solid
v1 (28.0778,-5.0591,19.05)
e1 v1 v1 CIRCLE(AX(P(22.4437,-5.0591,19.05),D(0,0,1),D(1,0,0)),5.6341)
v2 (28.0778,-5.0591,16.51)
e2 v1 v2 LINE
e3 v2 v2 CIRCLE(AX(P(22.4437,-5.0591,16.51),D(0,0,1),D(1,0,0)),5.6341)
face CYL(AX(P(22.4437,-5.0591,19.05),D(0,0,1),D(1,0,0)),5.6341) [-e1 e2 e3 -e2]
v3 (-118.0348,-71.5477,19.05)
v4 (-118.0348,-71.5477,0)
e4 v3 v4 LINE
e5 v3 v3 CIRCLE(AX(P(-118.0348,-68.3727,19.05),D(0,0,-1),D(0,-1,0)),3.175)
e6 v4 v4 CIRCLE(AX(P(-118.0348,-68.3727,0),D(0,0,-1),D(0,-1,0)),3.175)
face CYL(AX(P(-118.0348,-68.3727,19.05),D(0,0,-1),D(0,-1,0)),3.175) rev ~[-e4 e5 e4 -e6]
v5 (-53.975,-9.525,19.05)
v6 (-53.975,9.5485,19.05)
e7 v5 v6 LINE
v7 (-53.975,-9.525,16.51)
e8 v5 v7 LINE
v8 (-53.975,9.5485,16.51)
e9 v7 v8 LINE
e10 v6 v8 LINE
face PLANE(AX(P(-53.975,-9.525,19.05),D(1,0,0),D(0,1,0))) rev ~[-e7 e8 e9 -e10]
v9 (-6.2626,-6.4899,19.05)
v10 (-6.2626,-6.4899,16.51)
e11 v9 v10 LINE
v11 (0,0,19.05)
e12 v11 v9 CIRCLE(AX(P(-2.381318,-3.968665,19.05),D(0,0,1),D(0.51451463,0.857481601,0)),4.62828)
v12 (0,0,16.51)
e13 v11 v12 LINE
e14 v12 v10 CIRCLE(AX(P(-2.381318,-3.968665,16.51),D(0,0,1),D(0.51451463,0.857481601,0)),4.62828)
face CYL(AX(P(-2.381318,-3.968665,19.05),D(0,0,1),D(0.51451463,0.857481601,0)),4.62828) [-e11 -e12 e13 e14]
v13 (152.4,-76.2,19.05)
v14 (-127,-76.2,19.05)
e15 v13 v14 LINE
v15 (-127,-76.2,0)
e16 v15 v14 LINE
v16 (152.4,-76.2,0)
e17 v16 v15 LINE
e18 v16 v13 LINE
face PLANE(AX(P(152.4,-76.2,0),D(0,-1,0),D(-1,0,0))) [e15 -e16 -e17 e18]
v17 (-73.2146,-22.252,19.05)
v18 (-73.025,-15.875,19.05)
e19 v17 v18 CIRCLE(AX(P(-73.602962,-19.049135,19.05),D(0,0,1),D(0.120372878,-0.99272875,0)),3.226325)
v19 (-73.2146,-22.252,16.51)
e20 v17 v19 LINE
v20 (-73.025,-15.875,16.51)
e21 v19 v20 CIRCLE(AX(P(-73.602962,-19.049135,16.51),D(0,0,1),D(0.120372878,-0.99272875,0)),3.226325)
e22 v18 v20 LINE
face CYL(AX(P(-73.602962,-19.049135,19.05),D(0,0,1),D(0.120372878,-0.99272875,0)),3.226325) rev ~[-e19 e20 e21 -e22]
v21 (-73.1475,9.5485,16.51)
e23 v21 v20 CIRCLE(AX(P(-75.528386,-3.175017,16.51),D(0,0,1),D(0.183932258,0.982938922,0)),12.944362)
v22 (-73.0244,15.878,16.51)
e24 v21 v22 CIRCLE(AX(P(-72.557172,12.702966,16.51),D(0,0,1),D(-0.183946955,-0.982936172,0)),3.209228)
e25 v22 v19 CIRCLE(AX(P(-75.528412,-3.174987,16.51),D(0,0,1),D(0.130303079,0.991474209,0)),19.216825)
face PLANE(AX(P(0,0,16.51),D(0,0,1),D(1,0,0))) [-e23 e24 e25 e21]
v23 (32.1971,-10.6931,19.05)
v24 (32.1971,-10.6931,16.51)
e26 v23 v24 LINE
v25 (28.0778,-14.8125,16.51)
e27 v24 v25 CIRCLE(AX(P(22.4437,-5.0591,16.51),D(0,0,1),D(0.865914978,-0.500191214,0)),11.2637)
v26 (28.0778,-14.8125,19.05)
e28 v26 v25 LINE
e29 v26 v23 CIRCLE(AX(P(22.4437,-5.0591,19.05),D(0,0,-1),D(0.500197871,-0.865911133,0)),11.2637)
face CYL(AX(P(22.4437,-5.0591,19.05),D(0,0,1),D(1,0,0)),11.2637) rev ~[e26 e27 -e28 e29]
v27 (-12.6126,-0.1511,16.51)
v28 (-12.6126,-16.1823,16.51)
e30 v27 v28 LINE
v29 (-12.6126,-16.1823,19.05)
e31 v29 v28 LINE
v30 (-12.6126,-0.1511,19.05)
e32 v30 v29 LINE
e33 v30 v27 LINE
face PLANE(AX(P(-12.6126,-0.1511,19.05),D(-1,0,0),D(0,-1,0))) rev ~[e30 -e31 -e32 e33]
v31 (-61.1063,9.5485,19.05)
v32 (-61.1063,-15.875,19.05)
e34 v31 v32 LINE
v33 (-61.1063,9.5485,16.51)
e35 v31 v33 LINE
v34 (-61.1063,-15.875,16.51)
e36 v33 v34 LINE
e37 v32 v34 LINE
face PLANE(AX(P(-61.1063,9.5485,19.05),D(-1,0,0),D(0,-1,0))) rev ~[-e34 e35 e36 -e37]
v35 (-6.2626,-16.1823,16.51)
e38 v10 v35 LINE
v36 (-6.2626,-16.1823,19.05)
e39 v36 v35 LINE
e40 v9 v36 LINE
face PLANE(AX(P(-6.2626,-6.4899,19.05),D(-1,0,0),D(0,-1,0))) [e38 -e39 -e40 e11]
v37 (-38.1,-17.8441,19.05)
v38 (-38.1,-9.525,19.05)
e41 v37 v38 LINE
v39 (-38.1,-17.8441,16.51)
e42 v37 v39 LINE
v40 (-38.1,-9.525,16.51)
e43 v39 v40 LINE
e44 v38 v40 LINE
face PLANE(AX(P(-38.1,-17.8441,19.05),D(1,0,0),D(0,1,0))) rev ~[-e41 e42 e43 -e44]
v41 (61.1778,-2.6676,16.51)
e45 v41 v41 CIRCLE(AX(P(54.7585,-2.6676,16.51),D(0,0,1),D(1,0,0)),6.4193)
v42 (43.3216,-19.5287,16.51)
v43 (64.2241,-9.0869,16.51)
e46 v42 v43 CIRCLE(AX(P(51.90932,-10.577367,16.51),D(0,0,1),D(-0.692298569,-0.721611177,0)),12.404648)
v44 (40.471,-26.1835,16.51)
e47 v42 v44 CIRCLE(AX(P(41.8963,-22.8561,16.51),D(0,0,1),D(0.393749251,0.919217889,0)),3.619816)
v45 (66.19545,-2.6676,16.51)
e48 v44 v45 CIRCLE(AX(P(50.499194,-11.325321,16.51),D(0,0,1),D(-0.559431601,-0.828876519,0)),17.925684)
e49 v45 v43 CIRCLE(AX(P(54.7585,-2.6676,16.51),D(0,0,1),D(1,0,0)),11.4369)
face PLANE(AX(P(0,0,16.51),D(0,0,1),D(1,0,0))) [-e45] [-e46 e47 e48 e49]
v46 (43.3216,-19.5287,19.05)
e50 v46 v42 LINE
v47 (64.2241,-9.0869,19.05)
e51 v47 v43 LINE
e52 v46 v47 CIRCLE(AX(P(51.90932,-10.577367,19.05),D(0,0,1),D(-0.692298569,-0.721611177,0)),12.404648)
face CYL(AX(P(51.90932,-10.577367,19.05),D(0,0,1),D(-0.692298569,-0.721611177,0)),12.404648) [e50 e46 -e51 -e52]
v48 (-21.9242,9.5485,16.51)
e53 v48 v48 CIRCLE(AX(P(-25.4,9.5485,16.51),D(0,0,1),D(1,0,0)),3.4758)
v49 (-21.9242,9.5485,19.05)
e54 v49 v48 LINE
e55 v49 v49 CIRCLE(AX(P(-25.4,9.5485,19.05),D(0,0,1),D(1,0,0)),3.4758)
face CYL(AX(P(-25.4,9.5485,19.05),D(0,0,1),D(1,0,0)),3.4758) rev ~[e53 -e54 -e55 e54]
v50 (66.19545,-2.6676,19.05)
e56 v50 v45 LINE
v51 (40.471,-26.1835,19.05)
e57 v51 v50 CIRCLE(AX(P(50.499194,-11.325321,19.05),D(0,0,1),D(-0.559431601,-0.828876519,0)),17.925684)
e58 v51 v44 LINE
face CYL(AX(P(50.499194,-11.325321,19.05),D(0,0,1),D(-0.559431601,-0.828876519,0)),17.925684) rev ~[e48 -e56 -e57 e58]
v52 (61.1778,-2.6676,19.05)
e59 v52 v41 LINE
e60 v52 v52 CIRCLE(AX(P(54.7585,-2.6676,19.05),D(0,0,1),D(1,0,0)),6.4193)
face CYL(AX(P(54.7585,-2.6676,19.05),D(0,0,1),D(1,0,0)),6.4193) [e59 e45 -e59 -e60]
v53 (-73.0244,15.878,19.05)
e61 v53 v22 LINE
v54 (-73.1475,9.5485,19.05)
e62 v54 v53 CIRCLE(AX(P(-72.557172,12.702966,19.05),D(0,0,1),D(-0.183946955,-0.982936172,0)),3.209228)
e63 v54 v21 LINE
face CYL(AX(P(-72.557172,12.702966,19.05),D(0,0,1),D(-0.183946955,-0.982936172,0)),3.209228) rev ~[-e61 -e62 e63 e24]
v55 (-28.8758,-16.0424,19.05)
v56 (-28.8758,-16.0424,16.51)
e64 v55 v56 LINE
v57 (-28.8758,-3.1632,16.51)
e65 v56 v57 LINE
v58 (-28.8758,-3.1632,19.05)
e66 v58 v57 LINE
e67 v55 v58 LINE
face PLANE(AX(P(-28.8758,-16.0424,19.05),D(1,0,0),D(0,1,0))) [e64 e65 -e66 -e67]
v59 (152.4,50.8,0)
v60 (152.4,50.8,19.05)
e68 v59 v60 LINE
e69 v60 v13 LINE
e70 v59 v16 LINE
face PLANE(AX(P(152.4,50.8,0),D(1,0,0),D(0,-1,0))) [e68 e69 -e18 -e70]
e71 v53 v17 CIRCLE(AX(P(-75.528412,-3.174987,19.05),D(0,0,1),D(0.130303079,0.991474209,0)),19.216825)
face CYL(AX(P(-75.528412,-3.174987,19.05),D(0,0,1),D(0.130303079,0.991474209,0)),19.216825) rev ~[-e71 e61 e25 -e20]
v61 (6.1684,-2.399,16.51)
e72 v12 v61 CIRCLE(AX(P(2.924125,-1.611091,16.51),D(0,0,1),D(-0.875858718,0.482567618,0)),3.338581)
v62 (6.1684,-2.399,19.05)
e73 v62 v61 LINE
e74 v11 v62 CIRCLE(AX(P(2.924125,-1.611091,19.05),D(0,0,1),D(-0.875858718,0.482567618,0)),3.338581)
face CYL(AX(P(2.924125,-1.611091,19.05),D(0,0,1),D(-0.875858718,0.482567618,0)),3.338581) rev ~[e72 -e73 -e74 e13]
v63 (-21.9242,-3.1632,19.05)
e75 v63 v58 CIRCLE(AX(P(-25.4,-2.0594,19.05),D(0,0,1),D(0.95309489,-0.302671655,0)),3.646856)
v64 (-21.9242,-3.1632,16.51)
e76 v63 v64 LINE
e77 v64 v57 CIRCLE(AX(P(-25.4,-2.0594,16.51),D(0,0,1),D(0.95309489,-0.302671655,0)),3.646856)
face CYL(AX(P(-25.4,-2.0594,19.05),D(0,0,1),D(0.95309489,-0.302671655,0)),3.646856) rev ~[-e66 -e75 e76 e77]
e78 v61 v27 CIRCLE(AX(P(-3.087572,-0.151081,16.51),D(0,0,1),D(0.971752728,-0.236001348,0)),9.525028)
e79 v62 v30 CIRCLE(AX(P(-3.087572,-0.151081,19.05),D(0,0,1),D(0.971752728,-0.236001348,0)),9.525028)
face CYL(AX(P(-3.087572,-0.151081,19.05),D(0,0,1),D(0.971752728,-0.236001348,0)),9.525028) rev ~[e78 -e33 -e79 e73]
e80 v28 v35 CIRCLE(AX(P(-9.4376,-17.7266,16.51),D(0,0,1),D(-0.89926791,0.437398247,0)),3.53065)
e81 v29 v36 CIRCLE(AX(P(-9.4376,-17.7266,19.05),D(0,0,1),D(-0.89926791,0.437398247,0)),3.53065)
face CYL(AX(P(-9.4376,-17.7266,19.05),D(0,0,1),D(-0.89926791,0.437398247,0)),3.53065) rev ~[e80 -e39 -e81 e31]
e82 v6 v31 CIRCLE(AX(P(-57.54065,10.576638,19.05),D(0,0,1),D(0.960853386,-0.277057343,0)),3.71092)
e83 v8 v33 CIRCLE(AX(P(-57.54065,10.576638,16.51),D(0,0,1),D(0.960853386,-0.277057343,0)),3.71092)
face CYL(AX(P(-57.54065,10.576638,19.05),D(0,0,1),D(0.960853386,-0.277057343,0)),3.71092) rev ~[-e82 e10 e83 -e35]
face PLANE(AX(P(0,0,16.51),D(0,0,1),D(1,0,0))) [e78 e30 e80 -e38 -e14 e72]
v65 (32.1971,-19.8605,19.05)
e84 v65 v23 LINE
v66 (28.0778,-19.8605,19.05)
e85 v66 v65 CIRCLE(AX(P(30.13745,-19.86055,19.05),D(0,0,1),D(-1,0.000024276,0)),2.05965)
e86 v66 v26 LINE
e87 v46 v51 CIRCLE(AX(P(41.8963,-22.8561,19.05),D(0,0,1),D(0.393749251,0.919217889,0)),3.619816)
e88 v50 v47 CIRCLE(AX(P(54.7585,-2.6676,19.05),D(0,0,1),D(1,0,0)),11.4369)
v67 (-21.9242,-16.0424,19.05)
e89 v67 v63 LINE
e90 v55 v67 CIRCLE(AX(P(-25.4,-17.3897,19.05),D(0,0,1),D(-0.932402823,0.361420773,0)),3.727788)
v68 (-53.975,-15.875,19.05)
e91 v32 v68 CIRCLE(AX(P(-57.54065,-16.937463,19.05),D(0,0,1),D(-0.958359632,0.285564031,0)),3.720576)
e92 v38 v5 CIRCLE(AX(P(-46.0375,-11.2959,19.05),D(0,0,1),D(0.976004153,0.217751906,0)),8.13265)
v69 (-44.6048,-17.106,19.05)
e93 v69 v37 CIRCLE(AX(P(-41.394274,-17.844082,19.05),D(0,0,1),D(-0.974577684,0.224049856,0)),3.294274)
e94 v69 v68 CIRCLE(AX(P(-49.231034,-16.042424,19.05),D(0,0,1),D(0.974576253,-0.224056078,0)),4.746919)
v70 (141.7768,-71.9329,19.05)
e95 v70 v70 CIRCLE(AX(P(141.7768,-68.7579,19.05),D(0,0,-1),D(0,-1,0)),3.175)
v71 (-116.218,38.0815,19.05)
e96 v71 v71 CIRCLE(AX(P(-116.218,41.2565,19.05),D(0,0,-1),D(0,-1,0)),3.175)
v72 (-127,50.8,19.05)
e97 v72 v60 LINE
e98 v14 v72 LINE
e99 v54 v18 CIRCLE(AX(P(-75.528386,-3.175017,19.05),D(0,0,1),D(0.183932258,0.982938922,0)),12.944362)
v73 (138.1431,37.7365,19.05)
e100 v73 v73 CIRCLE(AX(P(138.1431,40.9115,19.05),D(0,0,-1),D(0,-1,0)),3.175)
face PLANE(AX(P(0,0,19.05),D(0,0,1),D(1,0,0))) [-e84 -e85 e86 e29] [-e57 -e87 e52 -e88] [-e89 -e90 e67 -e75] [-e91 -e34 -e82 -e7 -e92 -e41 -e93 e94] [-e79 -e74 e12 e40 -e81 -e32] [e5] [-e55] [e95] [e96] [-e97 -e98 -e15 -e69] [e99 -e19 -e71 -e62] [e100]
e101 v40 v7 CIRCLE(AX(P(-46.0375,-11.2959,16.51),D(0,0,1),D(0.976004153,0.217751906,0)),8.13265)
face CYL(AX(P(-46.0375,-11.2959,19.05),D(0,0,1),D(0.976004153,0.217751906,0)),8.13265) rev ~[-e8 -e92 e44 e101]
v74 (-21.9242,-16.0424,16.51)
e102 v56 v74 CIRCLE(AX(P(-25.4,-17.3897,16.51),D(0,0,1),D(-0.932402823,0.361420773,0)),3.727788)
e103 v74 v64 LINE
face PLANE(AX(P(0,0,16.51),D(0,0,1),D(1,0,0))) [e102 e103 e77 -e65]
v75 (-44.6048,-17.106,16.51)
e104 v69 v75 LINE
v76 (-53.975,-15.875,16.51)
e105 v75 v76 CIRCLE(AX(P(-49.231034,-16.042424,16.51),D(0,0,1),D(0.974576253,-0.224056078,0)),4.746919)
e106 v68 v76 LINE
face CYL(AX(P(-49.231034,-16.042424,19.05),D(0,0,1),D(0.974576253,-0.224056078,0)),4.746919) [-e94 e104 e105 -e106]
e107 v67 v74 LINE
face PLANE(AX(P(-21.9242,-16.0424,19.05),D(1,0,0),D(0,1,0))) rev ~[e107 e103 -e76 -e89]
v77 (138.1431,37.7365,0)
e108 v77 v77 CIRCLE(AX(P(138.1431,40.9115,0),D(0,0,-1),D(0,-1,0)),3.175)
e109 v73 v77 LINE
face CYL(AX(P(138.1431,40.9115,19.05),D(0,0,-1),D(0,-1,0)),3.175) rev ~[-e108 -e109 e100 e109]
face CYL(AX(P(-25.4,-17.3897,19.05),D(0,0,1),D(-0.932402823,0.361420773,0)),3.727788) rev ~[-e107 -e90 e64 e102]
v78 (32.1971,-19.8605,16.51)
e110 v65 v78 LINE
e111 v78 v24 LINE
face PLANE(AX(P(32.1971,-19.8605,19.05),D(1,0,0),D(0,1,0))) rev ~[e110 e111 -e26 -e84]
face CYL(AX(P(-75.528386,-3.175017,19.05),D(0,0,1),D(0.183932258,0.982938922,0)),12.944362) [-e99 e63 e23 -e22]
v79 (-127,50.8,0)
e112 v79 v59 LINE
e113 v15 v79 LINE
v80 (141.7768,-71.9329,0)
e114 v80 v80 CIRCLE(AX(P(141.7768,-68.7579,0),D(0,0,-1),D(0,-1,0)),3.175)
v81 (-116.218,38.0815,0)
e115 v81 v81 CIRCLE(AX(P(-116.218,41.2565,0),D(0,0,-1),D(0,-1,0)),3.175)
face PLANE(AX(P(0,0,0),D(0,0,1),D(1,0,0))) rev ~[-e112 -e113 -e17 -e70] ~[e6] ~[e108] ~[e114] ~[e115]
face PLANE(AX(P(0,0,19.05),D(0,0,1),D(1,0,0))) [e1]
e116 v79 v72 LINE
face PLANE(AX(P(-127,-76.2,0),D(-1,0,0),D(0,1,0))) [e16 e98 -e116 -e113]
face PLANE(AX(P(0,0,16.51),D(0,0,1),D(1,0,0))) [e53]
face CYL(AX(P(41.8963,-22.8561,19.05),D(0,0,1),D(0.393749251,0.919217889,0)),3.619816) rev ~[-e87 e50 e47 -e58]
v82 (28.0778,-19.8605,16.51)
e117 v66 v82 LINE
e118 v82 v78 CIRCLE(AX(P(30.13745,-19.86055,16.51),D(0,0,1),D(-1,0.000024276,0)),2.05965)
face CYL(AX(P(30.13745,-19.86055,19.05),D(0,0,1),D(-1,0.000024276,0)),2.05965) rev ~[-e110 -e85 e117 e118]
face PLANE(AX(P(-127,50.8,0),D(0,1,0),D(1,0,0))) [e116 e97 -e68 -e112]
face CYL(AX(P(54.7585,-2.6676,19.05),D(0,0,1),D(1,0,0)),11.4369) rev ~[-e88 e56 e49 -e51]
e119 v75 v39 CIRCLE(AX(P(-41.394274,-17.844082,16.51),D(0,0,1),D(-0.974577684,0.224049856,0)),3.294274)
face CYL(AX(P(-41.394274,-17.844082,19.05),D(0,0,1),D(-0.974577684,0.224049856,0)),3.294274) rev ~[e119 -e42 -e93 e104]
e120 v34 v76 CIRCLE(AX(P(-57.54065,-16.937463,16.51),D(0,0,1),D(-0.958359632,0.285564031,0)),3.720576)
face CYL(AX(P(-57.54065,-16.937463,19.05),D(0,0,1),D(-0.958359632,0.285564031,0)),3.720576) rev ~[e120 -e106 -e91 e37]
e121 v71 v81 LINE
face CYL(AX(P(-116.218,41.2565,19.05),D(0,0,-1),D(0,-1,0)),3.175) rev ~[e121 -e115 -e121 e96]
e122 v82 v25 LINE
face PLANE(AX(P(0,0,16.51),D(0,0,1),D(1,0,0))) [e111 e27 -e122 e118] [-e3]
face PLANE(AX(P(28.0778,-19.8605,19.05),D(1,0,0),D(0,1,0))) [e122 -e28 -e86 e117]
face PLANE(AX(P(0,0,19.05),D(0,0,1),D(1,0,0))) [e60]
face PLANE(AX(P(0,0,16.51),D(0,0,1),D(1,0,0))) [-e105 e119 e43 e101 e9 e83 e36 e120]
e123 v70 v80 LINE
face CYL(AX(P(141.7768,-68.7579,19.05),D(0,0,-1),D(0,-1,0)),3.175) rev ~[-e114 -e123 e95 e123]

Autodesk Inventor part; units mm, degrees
ref_plane "YZ Plane" through (0, 0, 0) normal (1, 0, 0) x (0, 1, 0)
ref_plane "XZ Plane" through (0, 0, 0) normal (0, 1, 0) x (-1, 0, 0)
ref_plane "XY Plane" through (0, 0, 0) normal (0, 0, 1) x (1, 0, 0)
sketch "Sketch1" plane through (0, 0, 0) normal (0, 0, 1) x (1, 0, 0)
  line L0 (-127, 50.8) -> (152.4, 50.8)
  line L1 (152.4, 50.8) -> (152.4, -76.2)
  line L2 (152.4, -76.2) -> (-127, -76.2)
  line L3 (-127, -76.2) -> (-127, 50.8)
  point P0 (0, 0)
  dimension "d0" = 127
  dimension "d1" = 279.4
extrude "Extrusion1" add sketch "Sketch1" along normal blind 19.05
sketch "Sketch2" plane through (0, 0, 19.05) normal (0, 0, 1) x (1, 0, 0)
  arc A0 (-73.0244, 15.878) -> (-73.0246, -22.228) centre (-75.5284, -3.175) ccw
  arc A1 (-73.1475, 9.5485) -> (-73.025, -15.875) centre (-75.5284, -3.175) ccw
  arc A2 (-73.1475, 9.5485) -> (-73.0244, 15.878) centre (-72.5572, 12.703) ccw
  arc A3 (-73.2146, -22.252) -> (-73.025, -15.875) centre (-73.603, -19.0491) ccw
  line L0 (-61.1063, -15.875) -> (-61.1063, 9.5485)
  arc A4 (-61.1063, -15.875) -> (-53.975, -15.875) centre (-57.5407, -16.9375) ccw
  arc A5 (-53.975, 9.5485) -> (-61.1063, 9.5485) centre (-57.5407, 10.5766) ccw
  line L1 (-53.975, 9.5485) -> (-53.975, -9.525)
  arc A6 (-38.1, -9.525) -> (-53.975, -9.525) centre (-46.0375, -11.2959) ccw
  line L2 (-38.1, -9.525) -> (-38.1, -17.8441)
  arc A7 (-44.6048, -17.106) -> (-38.1, -17.8441) centre (-41.3943, -17.8441) ccw
  arc A8 (-44.6048, -17.106) -> (-53.975, -15.875) centre (-49.231, -16.0424) ccw
  circle A9 centre (-25.4, 9.5485) radius 3.4758
  arc A10 (-28.8758, -16.0424) -> (-21.9242, -16.0424) centre (-25.4, -17.3897) ccw
  arc A11 (-21.9242, -3.1632) -> (-28.8758, -3.1632) centre (-25.4, -2.0594) ccw
  line L3 (-28.8758, -3.1632) -> (-28.8758, -16.0424)
  line L4 (-21.9242, -3.1632) -> (-21.9242, -16.0424)
  arc A12 (-12.6126, -16.1823) -> (-6.2626, -16.1823) centre (-9.4376, -17.7266) ccw
  line L5 (-12.6126, -16.1823) -> (-12.6126, -0.1511)
  arc A13 (6.1684, -2.399) -> (-12.6126, -0.1511) centre (-3.0876, -0.1511) ccw
  line L6 (-6.2626, -16.1823) -> (-6.2626, -6.4899)
  arc A14 (0, 0) -> (6.1684, -2.399) centre (2.9241, -1.6111) ccw
  arc A15 (0, 0) -> (-6.2626, -6.4899) centre (-2.3813, -3.9688) ccw
  circle A16 centre (22.4437, -5.0591) radius 11.2637
  circle A17 centre (22.4437, -5.0591) radius 5.6341
  line L7 (28.0778, -14.8125) -> (28.0778, -19.8605)
  line L8 (32.1971, -10.6931) -> (32.1971, -19.8605)
  arc A18 (28.0778, -19.8605) -> (32.1971, -19.8605) centre (30.1375, -19.8605) ccw
  circle A19 centre (54.7585, -2.6676) radius 11.4369
  circle A20 centre (54.7585, -2.6676) radius 6.4193
  arc A21 (43.3216, -19.5287) -> (64.2241, -9.0869) centre (51.9093, -10.5775) ccw
  arc A22 (43.3216, -19.5287) -> (40.471, -26.1835) centre (41.8963, -22.8561) ccw
  arc A23 (40.471, -26.1835) -> (66.1955, -2.6676) centre (50.4992, -11.3254) ccw
emboss "Emboss1" sketch "Sketch2" operation cut depth 2.54 direction (0, 0, -1)
hole "Hole1" at (-116.218, 41.2565, 19.05) direction (0, 0, -1) diameter 6.35 end through all
hole "Hole2" at (-118.0348, -68.3727, 19.05) direction (0, 0, -1) diameter 6.35 end through all
hole "Hole3" at (138.1431, 40.9115, 19.05) direction (0, 0, -1) diameter 6.35 end through all
hole "Hole4" at (141.7768, -68.7579, 19.05) direction (0, 0, -1) diameter 6.35 end through all
properties part number "NameTag"
